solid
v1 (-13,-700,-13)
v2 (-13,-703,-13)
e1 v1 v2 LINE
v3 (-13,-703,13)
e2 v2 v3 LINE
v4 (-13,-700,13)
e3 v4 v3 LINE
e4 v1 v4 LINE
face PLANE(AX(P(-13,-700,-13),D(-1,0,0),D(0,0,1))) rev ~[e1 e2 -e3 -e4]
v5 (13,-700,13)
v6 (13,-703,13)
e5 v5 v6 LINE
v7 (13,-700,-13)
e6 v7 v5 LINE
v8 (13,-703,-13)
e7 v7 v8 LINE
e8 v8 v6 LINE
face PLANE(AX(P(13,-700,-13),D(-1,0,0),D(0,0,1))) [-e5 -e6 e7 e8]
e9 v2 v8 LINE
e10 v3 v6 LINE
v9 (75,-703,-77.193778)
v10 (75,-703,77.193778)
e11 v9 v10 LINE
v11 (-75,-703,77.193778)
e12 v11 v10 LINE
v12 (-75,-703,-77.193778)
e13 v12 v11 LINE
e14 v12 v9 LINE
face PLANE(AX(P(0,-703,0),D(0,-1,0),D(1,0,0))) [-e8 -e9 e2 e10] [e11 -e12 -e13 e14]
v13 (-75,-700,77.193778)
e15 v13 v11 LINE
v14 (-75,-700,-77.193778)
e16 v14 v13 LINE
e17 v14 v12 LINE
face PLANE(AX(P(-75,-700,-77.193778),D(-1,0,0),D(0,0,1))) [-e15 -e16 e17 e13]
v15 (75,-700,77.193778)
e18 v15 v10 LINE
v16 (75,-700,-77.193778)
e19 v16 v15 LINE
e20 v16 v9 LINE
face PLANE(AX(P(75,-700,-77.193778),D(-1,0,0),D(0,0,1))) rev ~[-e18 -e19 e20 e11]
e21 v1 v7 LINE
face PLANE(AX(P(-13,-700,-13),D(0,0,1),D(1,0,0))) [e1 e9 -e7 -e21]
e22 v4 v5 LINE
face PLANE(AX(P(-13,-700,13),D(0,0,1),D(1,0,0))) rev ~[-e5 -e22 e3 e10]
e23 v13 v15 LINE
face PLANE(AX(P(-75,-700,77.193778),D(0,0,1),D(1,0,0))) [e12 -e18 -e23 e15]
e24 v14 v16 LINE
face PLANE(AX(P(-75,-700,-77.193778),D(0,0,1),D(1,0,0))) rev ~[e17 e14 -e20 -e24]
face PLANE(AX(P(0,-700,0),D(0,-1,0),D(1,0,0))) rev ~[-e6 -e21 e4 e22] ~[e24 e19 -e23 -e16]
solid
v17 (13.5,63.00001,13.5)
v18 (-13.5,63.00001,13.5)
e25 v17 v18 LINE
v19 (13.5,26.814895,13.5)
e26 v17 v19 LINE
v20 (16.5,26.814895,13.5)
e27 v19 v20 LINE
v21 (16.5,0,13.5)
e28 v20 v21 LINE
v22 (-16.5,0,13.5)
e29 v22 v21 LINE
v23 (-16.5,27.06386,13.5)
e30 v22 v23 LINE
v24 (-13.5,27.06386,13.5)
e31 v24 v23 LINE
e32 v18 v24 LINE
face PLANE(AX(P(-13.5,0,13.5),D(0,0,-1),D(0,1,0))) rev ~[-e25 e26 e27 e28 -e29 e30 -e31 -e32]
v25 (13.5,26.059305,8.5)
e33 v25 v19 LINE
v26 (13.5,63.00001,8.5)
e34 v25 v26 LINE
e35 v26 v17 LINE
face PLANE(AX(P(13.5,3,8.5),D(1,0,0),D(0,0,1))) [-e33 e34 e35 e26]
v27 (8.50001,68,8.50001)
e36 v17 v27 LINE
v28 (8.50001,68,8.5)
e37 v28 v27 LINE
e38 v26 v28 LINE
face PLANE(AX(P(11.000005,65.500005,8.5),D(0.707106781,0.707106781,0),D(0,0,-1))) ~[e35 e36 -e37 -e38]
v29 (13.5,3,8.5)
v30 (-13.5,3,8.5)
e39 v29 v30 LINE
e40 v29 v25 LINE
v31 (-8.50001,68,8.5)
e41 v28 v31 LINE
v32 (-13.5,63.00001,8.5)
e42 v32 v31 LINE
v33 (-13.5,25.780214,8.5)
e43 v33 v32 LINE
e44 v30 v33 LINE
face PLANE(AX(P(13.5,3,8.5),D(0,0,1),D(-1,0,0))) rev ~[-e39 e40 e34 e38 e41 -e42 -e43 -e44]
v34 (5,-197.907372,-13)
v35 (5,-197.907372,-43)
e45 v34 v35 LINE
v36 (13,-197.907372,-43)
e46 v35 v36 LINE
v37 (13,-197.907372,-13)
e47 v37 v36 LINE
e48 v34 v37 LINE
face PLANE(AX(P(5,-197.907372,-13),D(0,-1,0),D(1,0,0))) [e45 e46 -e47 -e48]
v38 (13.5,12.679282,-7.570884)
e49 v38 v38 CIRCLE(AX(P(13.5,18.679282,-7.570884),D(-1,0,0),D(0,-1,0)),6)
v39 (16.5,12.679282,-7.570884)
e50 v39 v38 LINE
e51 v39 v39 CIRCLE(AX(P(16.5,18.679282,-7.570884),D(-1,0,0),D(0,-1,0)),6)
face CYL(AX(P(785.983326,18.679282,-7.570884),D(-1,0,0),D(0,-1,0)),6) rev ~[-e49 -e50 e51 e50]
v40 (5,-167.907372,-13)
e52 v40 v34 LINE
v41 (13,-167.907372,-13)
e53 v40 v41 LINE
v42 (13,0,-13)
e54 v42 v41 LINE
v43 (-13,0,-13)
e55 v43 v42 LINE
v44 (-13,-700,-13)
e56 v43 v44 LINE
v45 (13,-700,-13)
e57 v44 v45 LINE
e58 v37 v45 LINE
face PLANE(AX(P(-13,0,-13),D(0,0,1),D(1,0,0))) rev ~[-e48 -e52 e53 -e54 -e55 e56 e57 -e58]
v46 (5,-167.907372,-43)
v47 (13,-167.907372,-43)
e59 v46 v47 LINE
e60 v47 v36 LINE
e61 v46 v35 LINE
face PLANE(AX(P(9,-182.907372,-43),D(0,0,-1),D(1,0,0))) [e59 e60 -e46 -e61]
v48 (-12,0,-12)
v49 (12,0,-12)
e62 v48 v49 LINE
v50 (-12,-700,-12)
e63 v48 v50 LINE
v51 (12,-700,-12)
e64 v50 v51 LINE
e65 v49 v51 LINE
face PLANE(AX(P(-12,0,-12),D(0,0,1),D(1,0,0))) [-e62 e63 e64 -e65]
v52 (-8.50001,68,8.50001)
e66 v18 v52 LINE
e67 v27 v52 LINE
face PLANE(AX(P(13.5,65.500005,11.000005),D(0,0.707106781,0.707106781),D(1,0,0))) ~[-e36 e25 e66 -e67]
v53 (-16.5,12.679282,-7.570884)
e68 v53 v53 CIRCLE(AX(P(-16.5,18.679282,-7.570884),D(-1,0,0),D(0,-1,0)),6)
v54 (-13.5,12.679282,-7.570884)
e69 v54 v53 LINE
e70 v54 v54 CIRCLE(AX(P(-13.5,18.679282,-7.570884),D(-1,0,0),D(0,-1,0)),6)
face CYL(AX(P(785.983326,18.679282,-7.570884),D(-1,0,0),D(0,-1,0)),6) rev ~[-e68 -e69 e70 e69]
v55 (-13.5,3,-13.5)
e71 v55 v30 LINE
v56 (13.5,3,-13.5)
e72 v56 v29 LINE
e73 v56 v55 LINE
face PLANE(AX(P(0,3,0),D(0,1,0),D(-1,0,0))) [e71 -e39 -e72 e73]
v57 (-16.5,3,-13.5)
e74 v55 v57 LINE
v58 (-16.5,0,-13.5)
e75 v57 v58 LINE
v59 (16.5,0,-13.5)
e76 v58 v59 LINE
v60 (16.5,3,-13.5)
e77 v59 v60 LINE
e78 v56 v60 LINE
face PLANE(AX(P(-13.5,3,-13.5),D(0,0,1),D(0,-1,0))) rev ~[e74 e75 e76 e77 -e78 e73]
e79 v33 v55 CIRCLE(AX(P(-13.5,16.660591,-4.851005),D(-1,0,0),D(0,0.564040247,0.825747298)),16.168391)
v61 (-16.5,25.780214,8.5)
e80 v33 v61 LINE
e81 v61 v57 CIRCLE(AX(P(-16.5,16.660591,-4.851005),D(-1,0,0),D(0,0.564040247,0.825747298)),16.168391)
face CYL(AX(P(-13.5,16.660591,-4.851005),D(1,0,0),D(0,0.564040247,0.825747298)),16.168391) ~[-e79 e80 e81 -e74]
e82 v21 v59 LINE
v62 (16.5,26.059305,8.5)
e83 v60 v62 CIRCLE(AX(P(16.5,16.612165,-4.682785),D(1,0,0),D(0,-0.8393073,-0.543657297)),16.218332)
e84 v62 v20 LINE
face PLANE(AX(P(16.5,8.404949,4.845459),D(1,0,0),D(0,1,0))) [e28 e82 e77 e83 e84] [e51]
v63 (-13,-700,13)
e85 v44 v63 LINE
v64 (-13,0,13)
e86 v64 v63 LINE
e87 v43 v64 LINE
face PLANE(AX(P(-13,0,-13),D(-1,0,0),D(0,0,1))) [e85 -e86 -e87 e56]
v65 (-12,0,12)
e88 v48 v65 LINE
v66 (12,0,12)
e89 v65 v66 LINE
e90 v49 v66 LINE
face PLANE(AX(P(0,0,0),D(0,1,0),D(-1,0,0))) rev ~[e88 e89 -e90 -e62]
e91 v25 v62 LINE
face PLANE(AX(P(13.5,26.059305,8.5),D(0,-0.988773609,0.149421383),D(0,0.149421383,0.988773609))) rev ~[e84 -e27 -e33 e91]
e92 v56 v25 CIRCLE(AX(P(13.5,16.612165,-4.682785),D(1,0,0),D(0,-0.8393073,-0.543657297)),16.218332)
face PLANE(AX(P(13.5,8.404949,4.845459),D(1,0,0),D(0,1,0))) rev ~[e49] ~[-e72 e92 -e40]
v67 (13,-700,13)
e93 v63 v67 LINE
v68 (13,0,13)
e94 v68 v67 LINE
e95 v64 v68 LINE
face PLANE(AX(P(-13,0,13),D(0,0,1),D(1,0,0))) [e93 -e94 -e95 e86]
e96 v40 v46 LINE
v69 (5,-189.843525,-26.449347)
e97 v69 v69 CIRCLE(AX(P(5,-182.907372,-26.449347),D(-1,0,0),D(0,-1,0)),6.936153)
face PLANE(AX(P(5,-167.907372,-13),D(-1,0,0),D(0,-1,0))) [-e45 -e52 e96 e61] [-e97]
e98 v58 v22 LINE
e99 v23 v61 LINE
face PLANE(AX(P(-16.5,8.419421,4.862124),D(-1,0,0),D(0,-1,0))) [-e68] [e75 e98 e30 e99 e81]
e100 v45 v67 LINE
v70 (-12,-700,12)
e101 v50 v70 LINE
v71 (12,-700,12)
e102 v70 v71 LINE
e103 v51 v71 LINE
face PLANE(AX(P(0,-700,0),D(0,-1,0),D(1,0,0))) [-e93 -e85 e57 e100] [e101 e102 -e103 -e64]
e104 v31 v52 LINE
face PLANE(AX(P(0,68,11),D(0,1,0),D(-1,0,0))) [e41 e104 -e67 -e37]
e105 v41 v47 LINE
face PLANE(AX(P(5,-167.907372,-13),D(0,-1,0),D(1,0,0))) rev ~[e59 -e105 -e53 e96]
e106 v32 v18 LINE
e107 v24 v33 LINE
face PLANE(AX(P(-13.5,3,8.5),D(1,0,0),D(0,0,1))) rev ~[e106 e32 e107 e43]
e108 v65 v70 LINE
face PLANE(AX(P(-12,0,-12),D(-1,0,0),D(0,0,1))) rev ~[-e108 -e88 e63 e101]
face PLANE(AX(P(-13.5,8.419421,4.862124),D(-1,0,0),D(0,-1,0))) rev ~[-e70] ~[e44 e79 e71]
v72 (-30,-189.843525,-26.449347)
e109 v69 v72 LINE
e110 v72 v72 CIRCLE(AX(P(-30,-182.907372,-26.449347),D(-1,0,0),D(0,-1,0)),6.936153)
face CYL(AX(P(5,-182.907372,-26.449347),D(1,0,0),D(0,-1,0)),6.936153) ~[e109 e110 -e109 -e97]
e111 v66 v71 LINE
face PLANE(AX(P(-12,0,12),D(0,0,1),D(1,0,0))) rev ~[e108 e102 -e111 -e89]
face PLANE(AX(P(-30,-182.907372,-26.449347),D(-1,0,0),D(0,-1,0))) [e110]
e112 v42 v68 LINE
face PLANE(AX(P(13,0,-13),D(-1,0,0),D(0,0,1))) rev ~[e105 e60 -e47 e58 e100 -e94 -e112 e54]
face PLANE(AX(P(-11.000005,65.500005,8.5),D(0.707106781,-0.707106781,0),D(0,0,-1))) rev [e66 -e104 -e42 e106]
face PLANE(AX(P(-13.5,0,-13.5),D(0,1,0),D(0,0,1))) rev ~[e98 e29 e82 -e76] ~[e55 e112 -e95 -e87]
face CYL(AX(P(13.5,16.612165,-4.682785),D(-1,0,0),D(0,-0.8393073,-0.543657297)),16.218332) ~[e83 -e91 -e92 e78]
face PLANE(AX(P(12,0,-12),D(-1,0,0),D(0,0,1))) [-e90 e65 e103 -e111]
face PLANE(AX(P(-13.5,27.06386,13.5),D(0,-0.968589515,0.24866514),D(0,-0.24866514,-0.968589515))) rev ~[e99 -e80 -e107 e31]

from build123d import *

# Parameters (mm, degrees)
F0_W      = 26
F0_H      = 26
F0_W_2    = 24
F0_H_2    = 24
F1_DEPTH  = 700
F2_W      = 27
F2_H      = 27
F2_W_2    = 26
F2_H_2    = 26
F2_W_3    = 24
F2_H_3    = 24
F3_DEPTH  = 3
F4_W      = 150
F4_H      = 154.387555053
F4_W_2    = 26
F4_H_2    = 26
F5_DEPTH  = 3
F6_W      = 27
F6_H      = 5
F7_DEPTH  = 65
F8_SIZE   = 4.99999
F10_DEPTH = 3
F12_DEPTH = 3
F14_D     = 12
F15_W     = 8
F15_H     = 30
F16_DEPTH = 30
F17_R     = 6.9361526391
F18_DEPTH = 35


# Not quite as in the source:
# - a fillet or chamfer is up to 0.001 mm smaller than in the source, because OpenCascade refuses the exact size


with BuildPart() as f1:
    # F0 (on Front) → F1 (new body)
    with BuildSketch(Plane.XZ):
        Rectangle(F0_W, F0_H)
        Rectangle(F0_W_2, F0_H_2, mode=Mode.SUBTRACT)
    extrude(amount=F1_DEPTH)

    # F2 (on face) → F3 (join)
    with BuildSketch(Plane(origin=(0, 0, 0), x_dir=(-1, 0, 0), z_dir=(0, 1, 0))):
        Rectangle(F2_W, F2_H)
        Rectangle(F2_W_2, F2_H_2, mode=Mode.SUBTRACT)
        Rectangle(F2_W_2, F2_H_2)
        Rectangle(F2_W_3, F2_H_3, mode=Mode.SUBTRACT)
        Rectangle(F2_W_3, F2_H_3)
    extrude(amount=F3_DEPTH)

    # F6 (on face) → F7 (join)
    with BuildSketch(Plane(origin=(0, 3, 0), x_dir=(-1, 0, 0), z_dir=(0, 1, 0))):
        with Locations((0, 11)):
            Rectangle(F6_W, F6_H)
    extrude(amount=F7_DEPTH)

    # F8 (size 5 in the source; OpenCascade refuses exactly that, so slightly less here)
    f8_edges = [f1.edges().sort_by_distance(p)[0] for p in [
        (13.5, 68, 11),
        (0, 68, 13.5),
        (-13.5, 68, 11),
    ]]
    chamfer(f8_edges, length=F8_SIZE)

    # F9 (on face) → F10 (join)
    with BuildSketch(Plane.YZ.offset(13.5)):
        Polygon((0, -13.5), (3, -13.5), (3, 8.5), (26.0593052953, 8.5), (26.8148947507, 13.5), (0, 13.5), align=None)
        with BuildLine():
            Line((3, 8.5), (3, -13.5))
            ThreePointArc((3, -13.5), (27.8075589796, -16.4172407177), (26.0593052953, 8.5))
            Line((26.0593052953, 8.5), (3, 8.5))
        make_face()
    extrude(amount=F10_DEPTH)

    # F11 (on face) → F12 (join)
    with BuildSketch(Plane(origin=(-13.5, 0, 0), x_dir=(0, -1, 0), z_dir=(-1, 0, 0))):
        Polygon((-27.0638596267, 13.5), (-25.7802139968, 8.5), (-3, 8.5), (-3, -13.5), (0, -13.5), (0, 13.5), align=None)
        with BuildLine():
            Line((-3, 8.5), (-25.7802139968, 8.5))
            ThreePointArc((-25.7802139968, 8.5), (-27.8924695055, -16.4812139716), (-3, -13.5))
            Line((-3, -13.5), (-3, 8.5))
        make_face()
    extrude(amount=F12_DEPTH)

    # F14 (through all)
    with Locations(Plane.YZ.offset(16.5)):
        with Locations((18.6792816967, -7.5708841905)):
            Hole(F14_D / 2)

    # F15 (on face) → F16 (join)
    with BuildSketch(Plane(origin=(0, 0, -13), x_dir=(1, 0, 0), z_dir=(0, 0, -1))):
        with Locations((9, 182.907372117)):
            Rectangle(F15_W, F15_H)
    extrude(amount=F16_DEPTH)

    # F17 (on face) → F18 (join)
    with BuildSketch(Plane(origin=(5, 0, 0), x_dir=(0, -1, 0), z_dir=(-1, 0, 0))):
        with Locations((182.907372117, -26.4493469149)):
            Circle(F17_R)
    extrude(amount=F18_DEPTH)


with BuildPart() as f5:
    # F4 (on face) → F5 (new body)
    with BuildSketch(Plane.XZ.offset(700)):
        Rectangle(F4_W, F4_H)
        Rectangle(F4_W_2, F4_H_2, mode=Mode.SUBTRACT)
    extrude(amount=F5_DEPTH)


solid = Compound([f1.part, f5.part])
